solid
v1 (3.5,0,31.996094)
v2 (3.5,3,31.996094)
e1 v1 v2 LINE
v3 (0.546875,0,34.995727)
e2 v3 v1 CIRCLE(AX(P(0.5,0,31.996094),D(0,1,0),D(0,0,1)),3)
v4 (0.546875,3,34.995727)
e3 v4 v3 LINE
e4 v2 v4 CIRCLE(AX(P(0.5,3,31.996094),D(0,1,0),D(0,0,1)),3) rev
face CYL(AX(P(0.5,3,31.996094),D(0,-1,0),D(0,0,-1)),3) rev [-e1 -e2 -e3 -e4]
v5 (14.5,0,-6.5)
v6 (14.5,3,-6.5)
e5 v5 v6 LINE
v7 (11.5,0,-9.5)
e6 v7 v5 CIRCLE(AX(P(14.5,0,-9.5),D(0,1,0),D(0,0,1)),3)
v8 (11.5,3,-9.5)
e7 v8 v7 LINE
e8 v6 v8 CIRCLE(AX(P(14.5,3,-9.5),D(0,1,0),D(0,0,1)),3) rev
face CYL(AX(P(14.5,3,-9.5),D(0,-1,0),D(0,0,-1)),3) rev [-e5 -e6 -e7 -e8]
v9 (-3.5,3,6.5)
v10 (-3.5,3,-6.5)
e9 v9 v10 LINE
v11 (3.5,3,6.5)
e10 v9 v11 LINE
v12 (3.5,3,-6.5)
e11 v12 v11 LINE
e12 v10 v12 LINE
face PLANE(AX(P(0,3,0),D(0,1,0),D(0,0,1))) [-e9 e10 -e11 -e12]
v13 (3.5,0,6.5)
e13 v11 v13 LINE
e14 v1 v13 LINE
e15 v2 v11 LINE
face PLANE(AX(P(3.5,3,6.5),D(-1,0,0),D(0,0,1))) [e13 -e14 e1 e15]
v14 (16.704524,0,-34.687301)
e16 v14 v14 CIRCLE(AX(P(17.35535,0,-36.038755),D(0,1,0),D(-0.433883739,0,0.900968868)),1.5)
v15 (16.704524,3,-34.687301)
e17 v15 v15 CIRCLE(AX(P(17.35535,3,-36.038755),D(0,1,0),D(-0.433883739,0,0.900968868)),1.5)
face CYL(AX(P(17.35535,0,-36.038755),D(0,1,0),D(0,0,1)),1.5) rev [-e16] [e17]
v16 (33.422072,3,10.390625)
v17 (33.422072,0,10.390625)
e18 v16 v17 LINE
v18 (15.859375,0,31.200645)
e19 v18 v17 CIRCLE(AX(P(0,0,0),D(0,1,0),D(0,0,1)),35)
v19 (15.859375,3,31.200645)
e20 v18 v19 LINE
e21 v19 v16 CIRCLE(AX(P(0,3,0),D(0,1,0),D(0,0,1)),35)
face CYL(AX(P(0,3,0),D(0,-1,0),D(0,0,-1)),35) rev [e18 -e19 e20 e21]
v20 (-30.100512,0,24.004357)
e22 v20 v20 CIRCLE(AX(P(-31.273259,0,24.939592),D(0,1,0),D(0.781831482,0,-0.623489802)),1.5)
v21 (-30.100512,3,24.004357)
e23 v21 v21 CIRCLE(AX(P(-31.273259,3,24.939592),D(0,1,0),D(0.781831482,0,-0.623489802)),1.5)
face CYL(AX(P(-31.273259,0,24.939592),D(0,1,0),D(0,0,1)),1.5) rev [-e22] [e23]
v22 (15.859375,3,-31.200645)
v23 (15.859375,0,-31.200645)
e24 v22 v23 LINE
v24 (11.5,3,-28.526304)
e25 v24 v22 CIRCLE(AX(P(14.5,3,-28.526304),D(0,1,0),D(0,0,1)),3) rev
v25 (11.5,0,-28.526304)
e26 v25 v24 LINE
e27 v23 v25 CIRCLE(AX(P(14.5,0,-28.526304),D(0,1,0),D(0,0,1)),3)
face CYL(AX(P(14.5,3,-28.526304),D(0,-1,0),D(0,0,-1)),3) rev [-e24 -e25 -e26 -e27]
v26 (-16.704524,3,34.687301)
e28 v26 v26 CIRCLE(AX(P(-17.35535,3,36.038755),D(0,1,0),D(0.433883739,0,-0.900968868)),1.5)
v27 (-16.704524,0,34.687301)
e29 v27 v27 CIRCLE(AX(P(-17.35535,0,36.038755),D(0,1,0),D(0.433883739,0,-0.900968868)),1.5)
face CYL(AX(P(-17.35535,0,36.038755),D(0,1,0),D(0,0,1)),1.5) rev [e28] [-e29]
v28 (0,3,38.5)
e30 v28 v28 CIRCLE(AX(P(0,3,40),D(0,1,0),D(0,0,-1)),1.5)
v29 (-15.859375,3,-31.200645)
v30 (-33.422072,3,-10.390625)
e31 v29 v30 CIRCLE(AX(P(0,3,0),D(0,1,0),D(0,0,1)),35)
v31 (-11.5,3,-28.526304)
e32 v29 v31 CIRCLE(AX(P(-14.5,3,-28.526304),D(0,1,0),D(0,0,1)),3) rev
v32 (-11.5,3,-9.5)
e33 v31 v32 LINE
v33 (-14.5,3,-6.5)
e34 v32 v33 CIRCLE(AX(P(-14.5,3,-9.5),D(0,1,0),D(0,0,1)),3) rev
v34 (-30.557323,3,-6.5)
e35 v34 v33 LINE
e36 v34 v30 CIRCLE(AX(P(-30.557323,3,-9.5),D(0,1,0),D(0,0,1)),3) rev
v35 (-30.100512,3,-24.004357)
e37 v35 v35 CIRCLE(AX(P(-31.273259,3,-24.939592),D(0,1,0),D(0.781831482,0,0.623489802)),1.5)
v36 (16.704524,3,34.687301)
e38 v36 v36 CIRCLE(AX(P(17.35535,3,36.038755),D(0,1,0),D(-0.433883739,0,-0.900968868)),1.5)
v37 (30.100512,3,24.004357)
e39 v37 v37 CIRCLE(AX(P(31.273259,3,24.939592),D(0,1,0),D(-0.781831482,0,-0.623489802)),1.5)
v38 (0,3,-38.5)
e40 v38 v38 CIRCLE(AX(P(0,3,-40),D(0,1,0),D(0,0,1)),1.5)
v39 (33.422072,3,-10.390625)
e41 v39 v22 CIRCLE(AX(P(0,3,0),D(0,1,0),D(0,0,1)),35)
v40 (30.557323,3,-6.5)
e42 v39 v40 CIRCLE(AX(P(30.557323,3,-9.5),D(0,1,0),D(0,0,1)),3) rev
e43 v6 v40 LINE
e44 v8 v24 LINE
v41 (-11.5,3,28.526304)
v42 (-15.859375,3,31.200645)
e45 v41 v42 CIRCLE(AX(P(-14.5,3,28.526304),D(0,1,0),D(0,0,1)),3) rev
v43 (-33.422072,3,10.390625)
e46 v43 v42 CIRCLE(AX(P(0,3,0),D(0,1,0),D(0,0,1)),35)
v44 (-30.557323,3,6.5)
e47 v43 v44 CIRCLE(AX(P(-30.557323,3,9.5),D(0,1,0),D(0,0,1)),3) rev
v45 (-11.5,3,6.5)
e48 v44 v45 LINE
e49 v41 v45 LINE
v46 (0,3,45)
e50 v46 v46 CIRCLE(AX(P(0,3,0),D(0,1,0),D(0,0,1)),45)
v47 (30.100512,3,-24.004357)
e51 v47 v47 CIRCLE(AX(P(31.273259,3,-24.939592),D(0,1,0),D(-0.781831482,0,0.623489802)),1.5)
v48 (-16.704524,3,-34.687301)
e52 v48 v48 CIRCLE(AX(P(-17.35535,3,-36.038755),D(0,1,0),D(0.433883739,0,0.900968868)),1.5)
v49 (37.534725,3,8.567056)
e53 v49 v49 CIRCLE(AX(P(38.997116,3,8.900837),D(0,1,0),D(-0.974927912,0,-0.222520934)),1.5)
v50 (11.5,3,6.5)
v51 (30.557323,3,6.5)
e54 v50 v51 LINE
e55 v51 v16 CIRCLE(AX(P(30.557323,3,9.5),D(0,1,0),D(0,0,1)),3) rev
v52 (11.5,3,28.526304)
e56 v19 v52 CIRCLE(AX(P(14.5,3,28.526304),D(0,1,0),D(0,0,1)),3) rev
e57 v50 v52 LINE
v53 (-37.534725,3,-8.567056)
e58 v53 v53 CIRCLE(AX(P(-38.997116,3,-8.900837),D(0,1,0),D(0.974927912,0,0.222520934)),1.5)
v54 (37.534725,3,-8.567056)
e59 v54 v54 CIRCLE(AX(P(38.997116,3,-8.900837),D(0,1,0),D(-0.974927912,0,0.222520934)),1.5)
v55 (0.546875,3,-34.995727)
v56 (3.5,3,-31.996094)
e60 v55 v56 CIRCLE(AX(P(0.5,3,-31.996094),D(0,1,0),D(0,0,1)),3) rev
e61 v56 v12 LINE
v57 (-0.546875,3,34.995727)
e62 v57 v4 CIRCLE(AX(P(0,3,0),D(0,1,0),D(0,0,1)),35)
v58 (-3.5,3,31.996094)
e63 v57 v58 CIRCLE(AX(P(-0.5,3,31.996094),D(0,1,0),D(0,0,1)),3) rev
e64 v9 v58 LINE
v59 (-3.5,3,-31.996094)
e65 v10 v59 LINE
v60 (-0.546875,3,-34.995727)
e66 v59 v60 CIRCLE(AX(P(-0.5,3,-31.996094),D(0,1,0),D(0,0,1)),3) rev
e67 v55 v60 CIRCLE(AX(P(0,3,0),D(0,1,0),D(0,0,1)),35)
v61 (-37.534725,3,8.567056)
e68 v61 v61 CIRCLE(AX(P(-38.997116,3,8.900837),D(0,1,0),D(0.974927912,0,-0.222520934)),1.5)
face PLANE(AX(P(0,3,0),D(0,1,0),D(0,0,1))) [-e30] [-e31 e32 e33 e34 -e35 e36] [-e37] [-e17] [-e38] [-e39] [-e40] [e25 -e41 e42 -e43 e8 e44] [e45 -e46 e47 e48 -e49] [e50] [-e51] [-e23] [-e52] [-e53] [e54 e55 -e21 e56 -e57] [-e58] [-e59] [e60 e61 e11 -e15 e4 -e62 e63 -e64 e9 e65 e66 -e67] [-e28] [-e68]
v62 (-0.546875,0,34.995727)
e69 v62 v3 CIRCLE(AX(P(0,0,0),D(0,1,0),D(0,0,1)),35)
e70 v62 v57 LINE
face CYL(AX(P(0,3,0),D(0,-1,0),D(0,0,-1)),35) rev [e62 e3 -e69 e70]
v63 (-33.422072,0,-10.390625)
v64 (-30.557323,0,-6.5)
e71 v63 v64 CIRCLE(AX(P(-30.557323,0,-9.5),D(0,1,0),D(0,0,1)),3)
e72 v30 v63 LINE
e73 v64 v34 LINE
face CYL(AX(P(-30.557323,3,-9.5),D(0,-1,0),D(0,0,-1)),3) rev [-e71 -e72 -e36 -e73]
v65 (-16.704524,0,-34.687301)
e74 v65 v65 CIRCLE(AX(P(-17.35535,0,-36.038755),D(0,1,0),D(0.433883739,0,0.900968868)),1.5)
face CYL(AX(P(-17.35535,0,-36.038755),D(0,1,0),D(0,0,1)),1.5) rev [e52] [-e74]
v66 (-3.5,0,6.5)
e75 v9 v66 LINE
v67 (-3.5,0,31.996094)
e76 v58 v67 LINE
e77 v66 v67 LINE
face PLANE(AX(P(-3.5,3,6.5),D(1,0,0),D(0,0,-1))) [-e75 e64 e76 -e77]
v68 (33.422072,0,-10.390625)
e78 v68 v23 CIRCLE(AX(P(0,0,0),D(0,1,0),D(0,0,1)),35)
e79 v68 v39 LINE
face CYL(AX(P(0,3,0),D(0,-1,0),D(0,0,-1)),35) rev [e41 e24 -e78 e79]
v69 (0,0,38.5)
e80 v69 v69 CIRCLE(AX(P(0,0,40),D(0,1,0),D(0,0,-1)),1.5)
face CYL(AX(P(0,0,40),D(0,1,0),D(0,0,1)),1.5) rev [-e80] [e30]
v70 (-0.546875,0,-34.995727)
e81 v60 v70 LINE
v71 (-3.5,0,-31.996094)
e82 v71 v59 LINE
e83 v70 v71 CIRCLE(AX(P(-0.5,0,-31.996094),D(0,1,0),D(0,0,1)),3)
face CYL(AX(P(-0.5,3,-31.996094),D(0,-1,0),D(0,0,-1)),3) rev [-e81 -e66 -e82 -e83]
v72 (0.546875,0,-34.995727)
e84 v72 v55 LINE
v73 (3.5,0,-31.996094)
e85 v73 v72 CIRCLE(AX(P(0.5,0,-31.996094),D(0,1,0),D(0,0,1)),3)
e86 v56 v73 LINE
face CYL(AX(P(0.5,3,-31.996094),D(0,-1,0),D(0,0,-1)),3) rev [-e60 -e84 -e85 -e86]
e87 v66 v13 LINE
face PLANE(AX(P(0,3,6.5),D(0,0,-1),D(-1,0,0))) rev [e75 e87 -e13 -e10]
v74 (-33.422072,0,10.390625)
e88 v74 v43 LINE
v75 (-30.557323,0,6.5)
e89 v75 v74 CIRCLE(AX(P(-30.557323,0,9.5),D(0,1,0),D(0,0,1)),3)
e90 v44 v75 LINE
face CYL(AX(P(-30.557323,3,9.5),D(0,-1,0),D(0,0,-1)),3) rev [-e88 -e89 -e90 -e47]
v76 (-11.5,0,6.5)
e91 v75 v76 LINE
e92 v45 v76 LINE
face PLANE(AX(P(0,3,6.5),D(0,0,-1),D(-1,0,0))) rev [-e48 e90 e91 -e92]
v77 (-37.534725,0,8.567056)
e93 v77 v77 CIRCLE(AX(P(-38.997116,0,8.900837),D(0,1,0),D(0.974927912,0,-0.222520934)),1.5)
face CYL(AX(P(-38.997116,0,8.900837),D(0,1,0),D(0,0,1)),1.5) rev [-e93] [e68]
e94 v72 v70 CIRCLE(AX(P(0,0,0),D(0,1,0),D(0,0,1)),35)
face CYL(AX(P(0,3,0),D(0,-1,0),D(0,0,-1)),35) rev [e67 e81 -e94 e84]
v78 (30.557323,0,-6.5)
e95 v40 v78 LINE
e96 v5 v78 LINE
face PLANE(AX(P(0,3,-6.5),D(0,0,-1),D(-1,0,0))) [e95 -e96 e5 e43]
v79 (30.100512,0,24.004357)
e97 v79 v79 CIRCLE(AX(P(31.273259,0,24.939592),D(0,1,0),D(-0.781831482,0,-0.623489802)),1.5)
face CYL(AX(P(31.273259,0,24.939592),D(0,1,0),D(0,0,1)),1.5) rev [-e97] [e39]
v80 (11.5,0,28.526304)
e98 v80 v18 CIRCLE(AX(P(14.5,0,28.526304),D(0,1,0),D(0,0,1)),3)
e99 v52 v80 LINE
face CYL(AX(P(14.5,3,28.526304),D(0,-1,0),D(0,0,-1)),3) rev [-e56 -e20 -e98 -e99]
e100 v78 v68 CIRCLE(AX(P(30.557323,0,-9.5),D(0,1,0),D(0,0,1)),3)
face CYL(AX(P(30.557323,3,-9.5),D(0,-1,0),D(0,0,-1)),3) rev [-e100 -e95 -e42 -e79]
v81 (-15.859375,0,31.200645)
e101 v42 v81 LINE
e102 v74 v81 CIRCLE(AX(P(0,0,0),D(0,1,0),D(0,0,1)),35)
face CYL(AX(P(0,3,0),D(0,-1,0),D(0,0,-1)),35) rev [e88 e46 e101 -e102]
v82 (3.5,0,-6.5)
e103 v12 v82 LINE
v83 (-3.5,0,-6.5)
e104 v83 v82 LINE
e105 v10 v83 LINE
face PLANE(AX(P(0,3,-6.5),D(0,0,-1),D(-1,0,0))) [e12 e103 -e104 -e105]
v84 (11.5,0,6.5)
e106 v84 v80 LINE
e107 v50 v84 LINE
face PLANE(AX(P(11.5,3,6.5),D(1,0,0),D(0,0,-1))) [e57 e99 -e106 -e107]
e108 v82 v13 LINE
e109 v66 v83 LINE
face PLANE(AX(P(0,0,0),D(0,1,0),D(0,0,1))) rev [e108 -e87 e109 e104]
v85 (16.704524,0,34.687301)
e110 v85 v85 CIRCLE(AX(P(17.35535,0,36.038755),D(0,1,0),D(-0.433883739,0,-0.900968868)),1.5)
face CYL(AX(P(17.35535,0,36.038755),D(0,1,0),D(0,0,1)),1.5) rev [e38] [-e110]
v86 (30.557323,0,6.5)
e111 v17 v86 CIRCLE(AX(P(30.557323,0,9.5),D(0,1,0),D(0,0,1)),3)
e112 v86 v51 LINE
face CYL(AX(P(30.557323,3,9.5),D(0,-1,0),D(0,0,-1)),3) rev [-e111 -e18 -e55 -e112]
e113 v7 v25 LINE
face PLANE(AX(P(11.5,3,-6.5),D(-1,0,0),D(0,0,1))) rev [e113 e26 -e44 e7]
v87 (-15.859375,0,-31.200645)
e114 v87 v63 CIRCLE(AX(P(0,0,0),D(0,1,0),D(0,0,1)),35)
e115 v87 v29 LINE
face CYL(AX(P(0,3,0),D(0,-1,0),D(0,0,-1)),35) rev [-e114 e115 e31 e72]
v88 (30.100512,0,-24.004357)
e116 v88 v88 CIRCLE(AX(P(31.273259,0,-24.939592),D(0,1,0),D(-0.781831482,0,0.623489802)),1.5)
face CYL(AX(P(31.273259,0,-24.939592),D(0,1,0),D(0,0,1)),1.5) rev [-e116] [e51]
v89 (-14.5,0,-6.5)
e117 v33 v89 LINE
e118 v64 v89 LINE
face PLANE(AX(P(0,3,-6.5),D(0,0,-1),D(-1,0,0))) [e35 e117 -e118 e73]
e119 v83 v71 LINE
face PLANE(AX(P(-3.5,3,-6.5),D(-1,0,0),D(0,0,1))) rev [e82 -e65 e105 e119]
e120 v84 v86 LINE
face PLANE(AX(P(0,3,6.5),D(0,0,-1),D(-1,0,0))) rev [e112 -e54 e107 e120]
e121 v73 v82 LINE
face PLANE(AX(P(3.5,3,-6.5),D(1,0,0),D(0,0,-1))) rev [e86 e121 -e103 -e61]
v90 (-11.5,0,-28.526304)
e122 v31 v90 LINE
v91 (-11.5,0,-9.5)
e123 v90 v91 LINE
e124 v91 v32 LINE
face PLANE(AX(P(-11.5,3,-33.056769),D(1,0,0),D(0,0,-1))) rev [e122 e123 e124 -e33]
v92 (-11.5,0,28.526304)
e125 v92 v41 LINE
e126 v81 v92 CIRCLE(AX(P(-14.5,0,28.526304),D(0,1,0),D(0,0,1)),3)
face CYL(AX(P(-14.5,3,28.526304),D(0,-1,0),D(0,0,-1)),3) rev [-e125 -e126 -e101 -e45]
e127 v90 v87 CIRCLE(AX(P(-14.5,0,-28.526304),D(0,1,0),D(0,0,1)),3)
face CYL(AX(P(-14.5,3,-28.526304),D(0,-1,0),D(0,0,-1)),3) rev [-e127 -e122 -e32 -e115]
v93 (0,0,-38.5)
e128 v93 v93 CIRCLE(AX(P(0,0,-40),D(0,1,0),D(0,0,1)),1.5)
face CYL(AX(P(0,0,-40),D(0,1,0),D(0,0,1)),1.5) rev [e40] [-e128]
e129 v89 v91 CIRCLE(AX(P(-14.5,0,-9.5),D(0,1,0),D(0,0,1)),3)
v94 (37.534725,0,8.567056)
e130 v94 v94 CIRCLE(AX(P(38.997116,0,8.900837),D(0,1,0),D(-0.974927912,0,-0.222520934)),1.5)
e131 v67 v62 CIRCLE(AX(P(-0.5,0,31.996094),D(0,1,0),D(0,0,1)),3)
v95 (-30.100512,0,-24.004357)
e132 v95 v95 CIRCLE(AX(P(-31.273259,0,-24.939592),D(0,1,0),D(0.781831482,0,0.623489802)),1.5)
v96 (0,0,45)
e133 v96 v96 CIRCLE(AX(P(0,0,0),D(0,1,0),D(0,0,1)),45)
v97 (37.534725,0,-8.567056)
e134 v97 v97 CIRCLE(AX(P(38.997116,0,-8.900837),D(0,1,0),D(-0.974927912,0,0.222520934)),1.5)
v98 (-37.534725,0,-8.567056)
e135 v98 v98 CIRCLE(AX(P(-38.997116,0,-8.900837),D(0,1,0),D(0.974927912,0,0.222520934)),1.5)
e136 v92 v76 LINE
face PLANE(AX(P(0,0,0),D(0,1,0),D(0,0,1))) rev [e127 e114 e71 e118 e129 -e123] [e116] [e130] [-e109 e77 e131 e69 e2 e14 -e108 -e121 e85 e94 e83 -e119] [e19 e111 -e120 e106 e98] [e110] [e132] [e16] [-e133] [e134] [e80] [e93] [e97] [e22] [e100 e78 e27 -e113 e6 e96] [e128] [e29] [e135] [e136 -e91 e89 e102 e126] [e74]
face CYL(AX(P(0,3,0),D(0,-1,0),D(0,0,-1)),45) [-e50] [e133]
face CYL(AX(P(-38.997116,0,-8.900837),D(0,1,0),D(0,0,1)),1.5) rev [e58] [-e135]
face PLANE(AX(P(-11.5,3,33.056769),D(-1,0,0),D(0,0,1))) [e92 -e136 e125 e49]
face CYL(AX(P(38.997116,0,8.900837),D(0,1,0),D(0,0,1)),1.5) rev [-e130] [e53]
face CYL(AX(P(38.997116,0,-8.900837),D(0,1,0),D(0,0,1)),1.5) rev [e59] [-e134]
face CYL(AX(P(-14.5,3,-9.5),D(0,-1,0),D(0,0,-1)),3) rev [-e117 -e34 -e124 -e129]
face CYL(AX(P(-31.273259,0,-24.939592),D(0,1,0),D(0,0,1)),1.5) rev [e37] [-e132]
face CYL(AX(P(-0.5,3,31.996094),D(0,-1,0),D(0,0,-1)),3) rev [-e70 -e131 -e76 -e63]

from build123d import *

# Parameters (mm, degrees)
SKETCH_1_R               = 45
SKETCH_1_R_2             = 35
EXTRUDE_1_DEPTH          = 3
EXTRUDE_2_DEPTH          = 3
SKETCH_3_R               = 1.5
CUT_EXTRUDE_1_DEPTH      = 3
PATTERN_CIRCULAR_1_COUNT = 14
FILLET_1_R               = 3
EXTRUDE_3_DEPTH          = 3
FILLET_2_R               = 3
MIRROR_1_DEPTH           = 3


# Read off the part's stored shape, not the designer's step: Зеркальное отражение1
with BuildPart() as part:
    # Эскиз1 → Бобышка-Вытянуть1 (new body)
    with BuildSketch(Plane(origin=(0, 0, 0), x_dir=(1, 0, 0), z_dir=(0, 1, 0))):
        with Locations(Location((0, 0, 0), (0, 0, 270))):
            Circle(SKETCH_1_R)
        with Locations(Location((0, 0, 0), (0, 0, 270))):
            Circle(SKETCH_1_R_2, mode=Mode.SUBTRACT)
    extrude(amount=EXTRUDE_1_DEPTH)

    # Эскиз2 → Бобышка-Вытянуть2 (add)
    with BuildSketch(Plane(origin=(0, 0, 0), x_dir=(1, 0, 0), z_dir=(0, 1, 0))):
        with BuildLine():
            ThreePointArc((-34.391132578, 6.5), (-34.847450698, 3.264227303), (-35, 0))
            Line((-35, 0), (35, 0))
            ThreePointArc((35, 0), (34.847450698, 3.264227303), (34.391132578, 6.5))
            Line((34.391132578, 6.5), (-34.391132578, 6.5))
        make_face()
        with BuildLine():
            Line((35, 0), (-35, 0))
            ThreePointArc((-35, 0), (-34.847450698, -3.264227303), (-34.391132578, -6.5))
            Line((-34.391132578, -6.5), (34.391132578, -6.5))
            ThreePointArc((34.391132578, -6.5), (34.847450698, -3.264227303), (35, 0))
        make_face()
    extrude(amount=EXTRUDE_2_DEPTH)

    # Эскиз3 → Вырез-Вытянуть1 (cut)
    with BuildSketch(Plane(origin=(0, 3, 0), x_dir=(1, 0, 0), z_dir=(0, 1, 0))):
        with Locations(Location((0, 40, 0), (0, 0, 270))):
            Circle(SKETCH_3_R)
    cut_extrude_1 = extrude(amount=-CUT_EXTRUDE_1_DEPTH, mode=Mode.SUBTRACT)

    # Круговой массив1: Вырез-Вытянуть1 ×14 about axis
    pattern_circular_1_axis = Axis((0, 0, 0), (0, 1, 0))
    for i in range(1, PATTERN_CIRCULAR_1_COUNT):
        add(cut_extrude_1.rotate(pattern_circular_1_axis, i * 360 / PATTERN_CIRCULAR_1_COUNT), mode=Mode.SUBTRACT)

    # Скругление1
    fillet_1_edges = [part.edges().sort_by_distance(p)[0] for p in [
        (-34.391132578, 1.5, -6.5),
        (-34.391132578, 1.5, 6.5),
        (34.391132578, 1.5, 6.5),
        (34.391132578, 1.5, -6.5),
    ]]
    fillet(fillet_1_edges, radius=FILLET_1_R)

    # Эскиз4 → Бобышка-Вытянуть3 (add)
    with BuildSketch(Plane(origin=(0, 0, 0), x_dir=(1, 0, 0), z_dir=(0, 1, 0))):
        with BuildLine():
            Line((-3.5, 6.5), (-3.5, 34.824560299))
            ThreePointArc((-3.5, 34.824560299), (-7.551905138, 34.175557476), (-11.5, 33.056769352))
            Line((-11.5, 33.056769352), (-11.5, 6.5))
            Line((-11.5, 6.5), (-3.5, 6.5))
        make_face()
        with BuildLine():
            Line((3.5, 6.5), (3.5, 34.824560299))
            ThreePointArc((3.5, 34.824560299), (7.551905138, 34.175557476), (11.5, 33.056769352))
            Line((11.5, 33.056769352), (11.5, 6.5))
            Line((11.5, 6.5), (3.5, 6.5))
        make_face()
    extrude(amount=EXTRUDE_3_DEPTH)

    # Скругление2
    fillet_2_edges = [part.edges().sort_by_distance(p)[0] for p in [
        (-11.5, 1.5, -6.5),
        (-3.5, 1.5, -34.824560299),
        (-11.5, 1.5, -33.056769352),
        (11.5, 1.5, -6.5),
        (11.5, 1.5, -33.056769352),
        (3.5, 1.5, -34.824560299),
    ]]
    fillet(fillet_2_edges, radius=FILLET_2_R)

    # Зеркальное отражение1 outline → Зеркальное отражение1 (add)
    with BuildSketch(Plane(origin=(0, 0, 0), x_dir=(1, 0, 0), z_dir=(0, 1, 0))):
        with BuildLine():
            ThreePointArc((-0.546875, -34.995727278), (-2.637828922, -34.100775792), (-3.5, -31.996093512))
            Line((-3.5, -31.996093512), (-3.5, -6.5))
            Line((-3.5, -6.5), (-11.5, -6.5))
            Line((-11.5, -6.5), (-11.5, -28.526303651))
            ThreePointArc((-11.5, -28.526303651), (-12.93126245, -31.083462719), (-15.859375, -31.200644618))
            ThreePointArc((-15.859375, -31.200644618), (-8.419734133, -33.972166212), (-0.546875, -34.995727278))
        make_face()
        with BuildLine():
            Line((11.5, -6.5), (3.5, -6.5))
            Line((3.5, -6.5), (3.5, -31.996093512))
            ThreePointArc((3.5, -31.996093512), (2.637828922, -34.100775792), (0.546875, -34.995727278))
            ThreePointArc((0.546875, -34.995727278), (8.419734133, -33.972166212), (15.859375, -31.200644618))
            ThreePointArc((15.859375, -31.200644618), (12.93126245, -31.083462719), (11.5, -28.526303651))
            Line((11.5, -28.526303651), (11.5, -6.5))
        make_face()
    extrude(amount=MIRROR_1_DEPTH)


solid = part.part
